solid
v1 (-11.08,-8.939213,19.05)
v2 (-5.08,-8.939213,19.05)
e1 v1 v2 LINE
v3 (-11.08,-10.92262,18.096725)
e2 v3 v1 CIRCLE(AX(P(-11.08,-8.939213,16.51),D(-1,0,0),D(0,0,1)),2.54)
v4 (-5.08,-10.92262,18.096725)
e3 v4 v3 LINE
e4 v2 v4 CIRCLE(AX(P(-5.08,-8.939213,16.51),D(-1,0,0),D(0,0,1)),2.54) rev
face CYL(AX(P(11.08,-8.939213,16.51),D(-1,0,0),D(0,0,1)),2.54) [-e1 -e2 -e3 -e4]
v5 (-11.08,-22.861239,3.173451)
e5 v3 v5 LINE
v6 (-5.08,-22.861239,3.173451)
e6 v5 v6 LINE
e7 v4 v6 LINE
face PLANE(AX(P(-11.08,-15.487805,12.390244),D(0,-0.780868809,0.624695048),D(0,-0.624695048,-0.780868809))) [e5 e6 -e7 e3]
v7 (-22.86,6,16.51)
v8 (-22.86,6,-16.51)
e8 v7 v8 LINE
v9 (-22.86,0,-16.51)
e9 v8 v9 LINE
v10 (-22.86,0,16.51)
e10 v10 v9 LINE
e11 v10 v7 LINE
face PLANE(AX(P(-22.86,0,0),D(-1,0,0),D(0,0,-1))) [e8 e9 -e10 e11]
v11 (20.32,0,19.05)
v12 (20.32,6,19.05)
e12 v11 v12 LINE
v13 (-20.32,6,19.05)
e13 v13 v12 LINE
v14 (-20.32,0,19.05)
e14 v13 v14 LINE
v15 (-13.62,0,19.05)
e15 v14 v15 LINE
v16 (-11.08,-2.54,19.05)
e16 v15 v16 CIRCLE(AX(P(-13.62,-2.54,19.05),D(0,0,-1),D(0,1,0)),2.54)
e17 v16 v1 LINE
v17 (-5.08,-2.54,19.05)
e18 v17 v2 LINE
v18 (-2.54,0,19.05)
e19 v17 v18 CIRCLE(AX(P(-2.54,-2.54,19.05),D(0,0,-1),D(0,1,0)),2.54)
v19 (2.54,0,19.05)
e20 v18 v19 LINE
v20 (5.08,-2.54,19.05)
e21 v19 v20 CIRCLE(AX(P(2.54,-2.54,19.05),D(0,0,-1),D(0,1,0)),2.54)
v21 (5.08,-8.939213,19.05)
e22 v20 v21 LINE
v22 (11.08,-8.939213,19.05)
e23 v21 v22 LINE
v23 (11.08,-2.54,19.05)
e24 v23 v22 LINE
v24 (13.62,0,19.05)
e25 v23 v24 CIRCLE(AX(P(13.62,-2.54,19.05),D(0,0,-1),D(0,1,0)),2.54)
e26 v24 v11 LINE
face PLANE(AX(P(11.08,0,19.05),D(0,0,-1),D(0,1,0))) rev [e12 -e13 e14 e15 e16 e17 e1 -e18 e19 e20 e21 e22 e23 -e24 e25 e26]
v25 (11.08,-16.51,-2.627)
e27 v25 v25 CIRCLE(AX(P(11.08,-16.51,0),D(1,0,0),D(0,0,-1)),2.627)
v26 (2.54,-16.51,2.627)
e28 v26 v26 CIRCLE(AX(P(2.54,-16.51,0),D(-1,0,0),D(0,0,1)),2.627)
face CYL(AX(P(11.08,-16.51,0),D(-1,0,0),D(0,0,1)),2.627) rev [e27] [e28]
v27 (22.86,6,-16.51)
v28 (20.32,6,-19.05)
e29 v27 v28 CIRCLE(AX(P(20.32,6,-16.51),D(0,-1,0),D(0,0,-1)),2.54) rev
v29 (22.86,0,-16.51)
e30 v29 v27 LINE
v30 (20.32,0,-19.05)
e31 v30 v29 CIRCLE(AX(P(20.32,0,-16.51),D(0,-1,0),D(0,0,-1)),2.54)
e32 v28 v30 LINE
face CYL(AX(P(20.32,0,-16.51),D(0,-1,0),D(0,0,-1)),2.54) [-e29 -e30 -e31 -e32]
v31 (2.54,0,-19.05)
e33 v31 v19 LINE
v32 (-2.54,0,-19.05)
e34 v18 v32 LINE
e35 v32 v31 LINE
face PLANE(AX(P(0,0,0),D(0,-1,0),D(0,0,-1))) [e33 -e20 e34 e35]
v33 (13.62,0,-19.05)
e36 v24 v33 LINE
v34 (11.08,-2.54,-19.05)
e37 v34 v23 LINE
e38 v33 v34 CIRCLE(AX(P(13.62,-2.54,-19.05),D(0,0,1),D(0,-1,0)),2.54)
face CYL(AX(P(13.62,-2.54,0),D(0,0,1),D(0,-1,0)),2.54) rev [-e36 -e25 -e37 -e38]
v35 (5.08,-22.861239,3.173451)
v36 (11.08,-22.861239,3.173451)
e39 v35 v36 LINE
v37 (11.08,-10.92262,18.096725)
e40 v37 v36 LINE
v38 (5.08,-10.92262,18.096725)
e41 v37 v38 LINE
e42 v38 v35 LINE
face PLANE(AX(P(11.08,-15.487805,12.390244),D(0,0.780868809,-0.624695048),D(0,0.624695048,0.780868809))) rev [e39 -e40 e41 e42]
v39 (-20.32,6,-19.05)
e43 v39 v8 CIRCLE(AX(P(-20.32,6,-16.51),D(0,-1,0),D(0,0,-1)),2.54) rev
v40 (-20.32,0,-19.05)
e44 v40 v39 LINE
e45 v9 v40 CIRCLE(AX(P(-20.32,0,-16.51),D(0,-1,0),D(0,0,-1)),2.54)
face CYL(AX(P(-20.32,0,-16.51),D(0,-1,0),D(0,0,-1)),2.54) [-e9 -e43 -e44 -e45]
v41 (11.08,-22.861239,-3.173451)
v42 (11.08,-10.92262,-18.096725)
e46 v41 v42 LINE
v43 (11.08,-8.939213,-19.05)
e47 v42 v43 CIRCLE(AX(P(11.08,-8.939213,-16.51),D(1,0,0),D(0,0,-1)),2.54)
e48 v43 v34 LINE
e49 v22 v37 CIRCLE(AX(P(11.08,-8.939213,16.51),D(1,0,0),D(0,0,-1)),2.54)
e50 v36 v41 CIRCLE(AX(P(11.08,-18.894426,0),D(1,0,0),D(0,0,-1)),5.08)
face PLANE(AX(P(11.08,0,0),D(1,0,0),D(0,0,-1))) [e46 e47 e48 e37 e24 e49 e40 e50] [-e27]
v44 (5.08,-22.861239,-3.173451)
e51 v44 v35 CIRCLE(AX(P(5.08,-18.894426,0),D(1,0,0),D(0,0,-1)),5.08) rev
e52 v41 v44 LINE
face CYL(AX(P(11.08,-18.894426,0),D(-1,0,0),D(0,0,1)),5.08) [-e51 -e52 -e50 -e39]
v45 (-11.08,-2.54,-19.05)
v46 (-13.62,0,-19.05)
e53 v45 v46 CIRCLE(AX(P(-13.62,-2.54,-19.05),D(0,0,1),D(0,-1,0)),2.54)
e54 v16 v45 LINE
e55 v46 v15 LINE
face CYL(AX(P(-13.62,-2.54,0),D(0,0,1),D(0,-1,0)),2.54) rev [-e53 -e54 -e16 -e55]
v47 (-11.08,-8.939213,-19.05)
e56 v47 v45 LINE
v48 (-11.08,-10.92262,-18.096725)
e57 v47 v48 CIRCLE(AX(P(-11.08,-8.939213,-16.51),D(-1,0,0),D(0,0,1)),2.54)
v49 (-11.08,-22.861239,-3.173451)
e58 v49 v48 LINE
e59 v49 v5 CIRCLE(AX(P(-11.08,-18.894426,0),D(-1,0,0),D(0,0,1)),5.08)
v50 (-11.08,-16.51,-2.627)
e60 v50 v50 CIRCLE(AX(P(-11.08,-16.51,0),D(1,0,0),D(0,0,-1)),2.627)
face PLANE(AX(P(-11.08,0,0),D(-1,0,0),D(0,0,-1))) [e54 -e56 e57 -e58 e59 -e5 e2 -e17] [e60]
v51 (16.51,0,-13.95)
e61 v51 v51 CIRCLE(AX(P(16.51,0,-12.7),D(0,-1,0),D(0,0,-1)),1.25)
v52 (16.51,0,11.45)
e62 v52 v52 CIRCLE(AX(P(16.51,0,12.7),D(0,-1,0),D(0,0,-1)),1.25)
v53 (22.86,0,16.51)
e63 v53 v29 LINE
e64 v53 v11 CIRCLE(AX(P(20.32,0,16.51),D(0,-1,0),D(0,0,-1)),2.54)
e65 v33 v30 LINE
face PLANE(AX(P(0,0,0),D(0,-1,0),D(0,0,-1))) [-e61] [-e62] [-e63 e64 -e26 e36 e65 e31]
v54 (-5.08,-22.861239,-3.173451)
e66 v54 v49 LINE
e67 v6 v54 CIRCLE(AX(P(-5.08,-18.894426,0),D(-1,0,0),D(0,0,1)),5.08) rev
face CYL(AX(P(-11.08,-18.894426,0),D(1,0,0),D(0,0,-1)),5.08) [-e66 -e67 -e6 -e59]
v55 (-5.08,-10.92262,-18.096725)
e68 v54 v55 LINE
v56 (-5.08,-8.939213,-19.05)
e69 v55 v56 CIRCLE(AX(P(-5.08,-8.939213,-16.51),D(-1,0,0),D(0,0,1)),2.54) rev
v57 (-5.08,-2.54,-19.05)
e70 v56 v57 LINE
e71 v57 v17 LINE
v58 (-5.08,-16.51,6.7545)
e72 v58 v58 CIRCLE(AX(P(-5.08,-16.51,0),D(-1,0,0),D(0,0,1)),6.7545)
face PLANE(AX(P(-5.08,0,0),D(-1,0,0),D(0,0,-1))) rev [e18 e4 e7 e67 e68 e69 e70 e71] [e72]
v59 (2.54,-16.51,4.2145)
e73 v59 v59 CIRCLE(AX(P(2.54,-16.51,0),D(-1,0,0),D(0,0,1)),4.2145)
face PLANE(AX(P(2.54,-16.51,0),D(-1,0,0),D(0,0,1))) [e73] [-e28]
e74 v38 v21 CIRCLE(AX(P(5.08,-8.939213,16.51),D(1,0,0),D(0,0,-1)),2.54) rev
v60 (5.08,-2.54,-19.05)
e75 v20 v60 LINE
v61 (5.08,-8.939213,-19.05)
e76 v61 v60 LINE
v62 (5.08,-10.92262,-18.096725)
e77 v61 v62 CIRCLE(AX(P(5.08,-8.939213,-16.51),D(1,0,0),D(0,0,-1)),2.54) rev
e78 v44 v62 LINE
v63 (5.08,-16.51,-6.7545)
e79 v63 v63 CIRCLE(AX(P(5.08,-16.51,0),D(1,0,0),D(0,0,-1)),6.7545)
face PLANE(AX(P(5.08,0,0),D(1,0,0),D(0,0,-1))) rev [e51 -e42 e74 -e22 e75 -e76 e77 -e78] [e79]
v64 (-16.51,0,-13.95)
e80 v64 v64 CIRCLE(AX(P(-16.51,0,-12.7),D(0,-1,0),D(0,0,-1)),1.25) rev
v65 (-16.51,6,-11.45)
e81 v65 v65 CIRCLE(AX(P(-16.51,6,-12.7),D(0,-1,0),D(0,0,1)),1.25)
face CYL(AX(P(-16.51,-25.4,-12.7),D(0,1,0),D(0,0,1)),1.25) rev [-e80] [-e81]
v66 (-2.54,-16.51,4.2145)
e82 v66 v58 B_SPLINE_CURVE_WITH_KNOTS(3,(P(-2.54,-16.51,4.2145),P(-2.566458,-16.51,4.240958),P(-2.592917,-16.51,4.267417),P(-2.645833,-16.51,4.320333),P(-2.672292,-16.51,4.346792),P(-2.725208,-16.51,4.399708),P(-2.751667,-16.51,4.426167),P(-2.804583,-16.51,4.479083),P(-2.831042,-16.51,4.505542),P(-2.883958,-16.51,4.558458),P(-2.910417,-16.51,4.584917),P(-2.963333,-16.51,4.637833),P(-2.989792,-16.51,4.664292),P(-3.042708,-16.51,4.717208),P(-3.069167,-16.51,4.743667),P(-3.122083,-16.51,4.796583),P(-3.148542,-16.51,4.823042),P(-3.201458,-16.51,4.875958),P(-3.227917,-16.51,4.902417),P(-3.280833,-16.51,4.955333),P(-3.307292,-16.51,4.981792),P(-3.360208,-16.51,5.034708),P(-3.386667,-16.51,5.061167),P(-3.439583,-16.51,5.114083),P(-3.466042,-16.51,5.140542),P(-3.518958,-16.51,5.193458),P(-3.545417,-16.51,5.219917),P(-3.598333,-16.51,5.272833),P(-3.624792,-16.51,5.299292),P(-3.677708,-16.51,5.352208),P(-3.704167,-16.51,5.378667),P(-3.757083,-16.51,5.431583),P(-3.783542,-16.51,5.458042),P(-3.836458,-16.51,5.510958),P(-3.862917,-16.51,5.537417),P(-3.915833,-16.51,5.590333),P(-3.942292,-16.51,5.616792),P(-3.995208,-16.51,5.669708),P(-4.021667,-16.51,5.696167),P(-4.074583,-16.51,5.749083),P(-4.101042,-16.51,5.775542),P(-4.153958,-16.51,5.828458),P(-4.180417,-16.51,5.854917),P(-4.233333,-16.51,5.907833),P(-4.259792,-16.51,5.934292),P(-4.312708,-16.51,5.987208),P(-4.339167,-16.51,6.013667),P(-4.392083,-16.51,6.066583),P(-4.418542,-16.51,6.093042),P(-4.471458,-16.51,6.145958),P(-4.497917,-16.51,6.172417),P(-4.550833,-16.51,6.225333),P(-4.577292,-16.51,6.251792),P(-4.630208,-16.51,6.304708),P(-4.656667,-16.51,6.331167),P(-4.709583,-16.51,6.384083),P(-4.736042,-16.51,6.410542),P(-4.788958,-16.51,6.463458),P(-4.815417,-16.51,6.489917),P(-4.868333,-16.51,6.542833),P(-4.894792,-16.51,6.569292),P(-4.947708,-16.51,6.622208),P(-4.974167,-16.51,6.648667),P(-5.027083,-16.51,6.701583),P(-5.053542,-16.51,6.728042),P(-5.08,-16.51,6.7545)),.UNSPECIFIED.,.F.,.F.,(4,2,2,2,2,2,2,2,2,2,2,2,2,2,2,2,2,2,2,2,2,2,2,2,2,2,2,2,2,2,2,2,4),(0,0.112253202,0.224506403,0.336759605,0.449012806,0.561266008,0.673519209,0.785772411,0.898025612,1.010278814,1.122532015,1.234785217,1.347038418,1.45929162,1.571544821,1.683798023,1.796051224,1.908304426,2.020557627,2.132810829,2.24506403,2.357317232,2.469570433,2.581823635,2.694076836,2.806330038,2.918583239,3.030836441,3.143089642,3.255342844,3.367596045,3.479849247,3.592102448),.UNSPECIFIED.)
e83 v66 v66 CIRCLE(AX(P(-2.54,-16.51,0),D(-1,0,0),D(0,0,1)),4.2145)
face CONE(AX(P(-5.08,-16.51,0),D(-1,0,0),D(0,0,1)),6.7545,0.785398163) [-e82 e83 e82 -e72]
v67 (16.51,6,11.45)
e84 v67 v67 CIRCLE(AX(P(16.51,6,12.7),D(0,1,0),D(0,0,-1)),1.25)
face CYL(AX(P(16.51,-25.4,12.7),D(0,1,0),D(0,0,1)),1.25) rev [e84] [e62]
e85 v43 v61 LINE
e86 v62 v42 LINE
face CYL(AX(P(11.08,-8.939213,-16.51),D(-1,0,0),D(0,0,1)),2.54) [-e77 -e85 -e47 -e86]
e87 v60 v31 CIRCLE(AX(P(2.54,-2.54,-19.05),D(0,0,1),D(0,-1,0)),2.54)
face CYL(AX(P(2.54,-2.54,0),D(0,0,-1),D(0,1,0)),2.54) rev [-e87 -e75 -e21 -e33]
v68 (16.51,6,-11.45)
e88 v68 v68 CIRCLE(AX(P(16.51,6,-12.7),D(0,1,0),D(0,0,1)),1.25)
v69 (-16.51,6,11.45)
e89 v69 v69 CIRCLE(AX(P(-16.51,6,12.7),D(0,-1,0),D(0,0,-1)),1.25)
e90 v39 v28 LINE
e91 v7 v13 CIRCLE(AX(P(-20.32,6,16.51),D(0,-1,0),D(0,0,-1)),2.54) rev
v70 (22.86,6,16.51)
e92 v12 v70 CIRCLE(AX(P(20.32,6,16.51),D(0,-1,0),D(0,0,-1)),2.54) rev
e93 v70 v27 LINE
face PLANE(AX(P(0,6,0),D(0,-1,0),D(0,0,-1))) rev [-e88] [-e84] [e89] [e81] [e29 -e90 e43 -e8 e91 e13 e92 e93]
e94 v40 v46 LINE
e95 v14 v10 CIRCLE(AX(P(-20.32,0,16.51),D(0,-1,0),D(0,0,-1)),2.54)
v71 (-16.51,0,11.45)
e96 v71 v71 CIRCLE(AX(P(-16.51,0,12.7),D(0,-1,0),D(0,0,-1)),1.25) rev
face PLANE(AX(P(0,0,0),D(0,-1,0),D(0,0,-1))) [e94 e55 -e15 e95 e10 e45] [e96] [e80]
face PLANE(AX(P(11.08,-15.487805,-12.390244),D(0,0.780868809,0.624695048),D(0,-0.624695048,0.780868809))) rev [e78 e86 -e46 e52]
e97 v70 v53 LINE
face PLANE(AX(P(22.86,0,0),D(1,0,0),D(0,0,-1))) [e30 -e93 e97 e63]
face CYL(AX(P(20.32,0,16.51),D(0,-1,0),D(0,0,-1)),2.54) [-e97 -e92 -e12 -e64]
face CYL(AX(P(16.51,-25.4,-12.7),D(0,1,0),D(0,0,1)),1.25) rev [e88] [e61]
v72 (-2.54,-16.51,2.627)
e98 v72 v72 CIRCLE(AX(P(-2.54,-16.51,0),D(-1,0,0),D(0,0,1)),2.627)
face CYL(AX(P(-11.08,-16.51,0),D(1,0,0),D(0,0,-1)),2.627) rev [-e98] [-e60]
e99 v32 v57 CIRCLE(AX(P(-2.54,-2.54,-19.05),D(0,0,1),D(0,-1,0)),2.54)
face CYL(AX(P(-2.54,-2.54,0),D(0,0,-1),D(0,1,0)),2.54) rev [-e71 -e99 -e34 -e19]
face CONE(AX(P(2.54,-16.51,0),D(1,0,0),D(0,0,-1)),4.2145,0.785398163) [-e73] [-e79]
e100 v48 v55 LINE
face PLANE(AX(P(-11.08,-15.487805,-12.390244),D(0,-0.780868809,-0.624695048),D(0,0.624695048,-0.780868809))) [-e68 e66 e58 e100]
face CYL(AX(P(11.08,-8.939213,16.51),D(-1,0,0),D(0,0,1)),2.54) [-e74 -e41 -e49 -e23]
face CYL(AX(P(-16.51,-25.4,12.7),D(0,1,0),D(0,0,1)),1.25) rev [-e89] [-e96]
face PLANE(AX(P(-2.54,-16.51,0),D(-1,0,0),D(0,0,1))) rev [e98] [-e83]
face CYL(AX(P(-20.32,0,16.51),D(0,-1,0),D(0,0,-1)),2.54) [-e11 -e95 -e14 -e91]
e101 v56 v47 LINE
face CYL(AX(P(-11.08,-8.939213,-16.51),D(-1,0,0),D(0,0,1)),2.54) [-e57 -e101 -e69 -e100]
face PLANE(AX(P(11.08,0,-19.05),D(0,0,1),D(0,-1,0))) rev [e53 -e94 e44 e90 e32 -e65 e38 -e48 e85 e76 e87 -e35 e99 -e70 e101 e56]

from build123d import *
from OCP.BRepFilletAPI import BRepFilletAPI_MakeFillet

# Parameters (mm, degrees)
SKETCH1_R           = 2.627
BOSS_EXTRUDE1_DEPTH = 6
BOSS_EXTRUDE2_START = -5.08
SKETCH1_3_W         = 38.1
SKETCH1_3_H         = 5.999999938
BOSS_EXTRUDE2_DEPTH = 22.86
SKETCH3_R           = 1.25
CUT_EXTRUDE1_DEPTH  = 44.260167546
FILLET1_R1          = 2.54
FILLET1_R2          = 5.08
SKETCH4_R           = 4.2145
SKETCH4_R_2         = 2.627
BOSS_EXTRUDE3_DEPTH = 2.54
BOSS_EXTRUDE4_START = 7.62
SKETCH4_2_R         = 4.2145
SKETCH4_2_R_2       = 2.627
BOSS_EXTRUDE4_DEPTH = 2.54
CHAMFER2_SIZE       = 2.54


with BuildPart() as part:
    # Sketch1 → Boss-Extrude1 (new body)
    with BuildSketch(Plane(origin=(5.08, 0, 0), x_dir=(0, 0, -1), z_dir=(1, 0, 0))):
        Polygon((-19.05, 0), (-19.05, -10.16), (0, -25.4), (19.05, -10.16), (19.05, 0), align=None)
        with Locations((0, -16.51)):
            Circle(SKETCH1_R, mode=Mode.SUBTRACT)
    boss_extrude1 = extrude(amount=BOSS_EXTRUDE1_DEPTH)

    # Sketch1<3> → Boss-Extrude2 (add)
    with BuildSketch(Plane(origin=(5.08, 0, 0), x_dir=(0, 0, -1), z_dir=(1, 0, 0)).offset(BOSS_EXTRUDE2_START)):
        with Locations((0, 2.999999969)):
            Rectangle(SKETCH1_3_W, SKETCH1_3_H)
    boss_extrude2 = extrude(amount=BOSS_EXTRUDE2_DEPTH)

    # Sketch3 → Cut-Extrude1 (cut, through all)
    with BuildSketch(Plane(origin=(0, 5.999999938, 0), x_dir=(1, 0, 0), z_dir=(0, 1, 0))):
        with Locations(Location((16.51, 12.7, 0), (0, 0, 270))):
            Circle(SKETCH3_R)
        with Locations(Location((16.51, -12.7, 0), (0, 0, 90))):
            Circle(SKETCH3_R)
    cut_extrude1 = extrude(amount=-CUT_EXTRUDE1_DEPTH, mode=Mode.SUBTRACT)

    # Mirror2: Boss-Extrude2, Cut-Extrude1 across plane
    add(boss_extrude2.mirror(Plane(origin=(0, 0, 0), x_dir=(0, 0, 1), z_dir=(1, 0, 0))))
    add(cut_extrude1.mirror(Plane(origin=(0, 0, 0), x_dir=(0, 0, 1), z_dir=(1, 0, 0))), mode=Mode.SUBTRACT)

    # Mirror3: Boss-Extrude1 across plane
    add(boss_extrude1.mirror(Plane(origin=(0, 0, 0), x_dir=(0, 0, 1), z_dir=(1, 0, 0))))

    # Fillet1: one fillet with a radius per group of edges: ONE call of the kernel's fillet builder (fillet() takes one radius for all edges)
    fillet1_edges_1 = [part.edges().sort_by_distance(p)[0] for p in [
        (8.08, -10.16, 19.05),
        (8.08, -10.16, -19.05),
        (11.08, 0, 0),
        (22.86, 2.999999969, 19.05),
        (22.86, 2.999999969, -19.05),
        (-22.86, 2.999999969, -19.05),
        (-22.86, 2.999999969, 19.05),
        (-8.08, -10.16, -19.05),
        (-8.08, -10.16, 19.05),
        (-5.08, 0, 0),
        (-11.08, 0, 0),
        (5.08, 0, 0),
    ]]
    fillet1_edges_2 = [part.edges().sort_by_distance(p)[0] for p in [
        (8.08, -25.4, 0),
        (-8.08, -25.4, 0),
    ]]
    fillet1 = BRepFilletAPI_MakeFillet(part.part.solid().wrapped)
    for e in fillet1_edges_1:
        fillet1.Add(FILLET1_R1, e.wrapped)
    for e in fillet1_edges_2:
        fillet1.Add(FILLET1_R2, e.wrapped)
    add(Compound.cast(fillet1.Shape()), mode=Mode.REPLACE)

    # Sketch4 → Boss-Extrude3 (add)
    with BuildSketch(Plane.ZY.offset(-5.08)):
        with Locations(Location((0, -16.51, 0), (0, 0, 180))):
            Circle(SKETCH4_R)
        with Locations((0, -16.51)):
            Circle(SKETCH4_R_2, mode=Mode.SUBTRACT)
    extrude(amount=BOSS_EXTRUDE3_DEPTH)

    # Sketch4<2> → Boss-Extrude4 (add)
    with BuildSketch(Plane.ZY.offset(-5.08).offset(BOSS_EXTRUDE4_START)):
        with Locations(Location((0, -16.51, 0), (0, 0, 180))):
            Circle(SKETCH4_2_R)
        with Locations((0, -16.51)):
            Circle(SKETCH4_2_R_2, mode=Mode.SUBTRACT)
    extrude(amount=BOSS_EXTRUDE4_DEPTH)

    # Chamfer2
    chamfer2_edges = [part.edges().sort_by_distance(p)[0] for p in [
        (5.08, -16.51, 4.2145),
        (-5.08, -16.51, 4.2145),
    ]]
    chamfer(chamfer2_edges, length=CHAMFER2_SIZE - 0.0001)  # a hair under: the kernel refuses the full size


solid = part.part
